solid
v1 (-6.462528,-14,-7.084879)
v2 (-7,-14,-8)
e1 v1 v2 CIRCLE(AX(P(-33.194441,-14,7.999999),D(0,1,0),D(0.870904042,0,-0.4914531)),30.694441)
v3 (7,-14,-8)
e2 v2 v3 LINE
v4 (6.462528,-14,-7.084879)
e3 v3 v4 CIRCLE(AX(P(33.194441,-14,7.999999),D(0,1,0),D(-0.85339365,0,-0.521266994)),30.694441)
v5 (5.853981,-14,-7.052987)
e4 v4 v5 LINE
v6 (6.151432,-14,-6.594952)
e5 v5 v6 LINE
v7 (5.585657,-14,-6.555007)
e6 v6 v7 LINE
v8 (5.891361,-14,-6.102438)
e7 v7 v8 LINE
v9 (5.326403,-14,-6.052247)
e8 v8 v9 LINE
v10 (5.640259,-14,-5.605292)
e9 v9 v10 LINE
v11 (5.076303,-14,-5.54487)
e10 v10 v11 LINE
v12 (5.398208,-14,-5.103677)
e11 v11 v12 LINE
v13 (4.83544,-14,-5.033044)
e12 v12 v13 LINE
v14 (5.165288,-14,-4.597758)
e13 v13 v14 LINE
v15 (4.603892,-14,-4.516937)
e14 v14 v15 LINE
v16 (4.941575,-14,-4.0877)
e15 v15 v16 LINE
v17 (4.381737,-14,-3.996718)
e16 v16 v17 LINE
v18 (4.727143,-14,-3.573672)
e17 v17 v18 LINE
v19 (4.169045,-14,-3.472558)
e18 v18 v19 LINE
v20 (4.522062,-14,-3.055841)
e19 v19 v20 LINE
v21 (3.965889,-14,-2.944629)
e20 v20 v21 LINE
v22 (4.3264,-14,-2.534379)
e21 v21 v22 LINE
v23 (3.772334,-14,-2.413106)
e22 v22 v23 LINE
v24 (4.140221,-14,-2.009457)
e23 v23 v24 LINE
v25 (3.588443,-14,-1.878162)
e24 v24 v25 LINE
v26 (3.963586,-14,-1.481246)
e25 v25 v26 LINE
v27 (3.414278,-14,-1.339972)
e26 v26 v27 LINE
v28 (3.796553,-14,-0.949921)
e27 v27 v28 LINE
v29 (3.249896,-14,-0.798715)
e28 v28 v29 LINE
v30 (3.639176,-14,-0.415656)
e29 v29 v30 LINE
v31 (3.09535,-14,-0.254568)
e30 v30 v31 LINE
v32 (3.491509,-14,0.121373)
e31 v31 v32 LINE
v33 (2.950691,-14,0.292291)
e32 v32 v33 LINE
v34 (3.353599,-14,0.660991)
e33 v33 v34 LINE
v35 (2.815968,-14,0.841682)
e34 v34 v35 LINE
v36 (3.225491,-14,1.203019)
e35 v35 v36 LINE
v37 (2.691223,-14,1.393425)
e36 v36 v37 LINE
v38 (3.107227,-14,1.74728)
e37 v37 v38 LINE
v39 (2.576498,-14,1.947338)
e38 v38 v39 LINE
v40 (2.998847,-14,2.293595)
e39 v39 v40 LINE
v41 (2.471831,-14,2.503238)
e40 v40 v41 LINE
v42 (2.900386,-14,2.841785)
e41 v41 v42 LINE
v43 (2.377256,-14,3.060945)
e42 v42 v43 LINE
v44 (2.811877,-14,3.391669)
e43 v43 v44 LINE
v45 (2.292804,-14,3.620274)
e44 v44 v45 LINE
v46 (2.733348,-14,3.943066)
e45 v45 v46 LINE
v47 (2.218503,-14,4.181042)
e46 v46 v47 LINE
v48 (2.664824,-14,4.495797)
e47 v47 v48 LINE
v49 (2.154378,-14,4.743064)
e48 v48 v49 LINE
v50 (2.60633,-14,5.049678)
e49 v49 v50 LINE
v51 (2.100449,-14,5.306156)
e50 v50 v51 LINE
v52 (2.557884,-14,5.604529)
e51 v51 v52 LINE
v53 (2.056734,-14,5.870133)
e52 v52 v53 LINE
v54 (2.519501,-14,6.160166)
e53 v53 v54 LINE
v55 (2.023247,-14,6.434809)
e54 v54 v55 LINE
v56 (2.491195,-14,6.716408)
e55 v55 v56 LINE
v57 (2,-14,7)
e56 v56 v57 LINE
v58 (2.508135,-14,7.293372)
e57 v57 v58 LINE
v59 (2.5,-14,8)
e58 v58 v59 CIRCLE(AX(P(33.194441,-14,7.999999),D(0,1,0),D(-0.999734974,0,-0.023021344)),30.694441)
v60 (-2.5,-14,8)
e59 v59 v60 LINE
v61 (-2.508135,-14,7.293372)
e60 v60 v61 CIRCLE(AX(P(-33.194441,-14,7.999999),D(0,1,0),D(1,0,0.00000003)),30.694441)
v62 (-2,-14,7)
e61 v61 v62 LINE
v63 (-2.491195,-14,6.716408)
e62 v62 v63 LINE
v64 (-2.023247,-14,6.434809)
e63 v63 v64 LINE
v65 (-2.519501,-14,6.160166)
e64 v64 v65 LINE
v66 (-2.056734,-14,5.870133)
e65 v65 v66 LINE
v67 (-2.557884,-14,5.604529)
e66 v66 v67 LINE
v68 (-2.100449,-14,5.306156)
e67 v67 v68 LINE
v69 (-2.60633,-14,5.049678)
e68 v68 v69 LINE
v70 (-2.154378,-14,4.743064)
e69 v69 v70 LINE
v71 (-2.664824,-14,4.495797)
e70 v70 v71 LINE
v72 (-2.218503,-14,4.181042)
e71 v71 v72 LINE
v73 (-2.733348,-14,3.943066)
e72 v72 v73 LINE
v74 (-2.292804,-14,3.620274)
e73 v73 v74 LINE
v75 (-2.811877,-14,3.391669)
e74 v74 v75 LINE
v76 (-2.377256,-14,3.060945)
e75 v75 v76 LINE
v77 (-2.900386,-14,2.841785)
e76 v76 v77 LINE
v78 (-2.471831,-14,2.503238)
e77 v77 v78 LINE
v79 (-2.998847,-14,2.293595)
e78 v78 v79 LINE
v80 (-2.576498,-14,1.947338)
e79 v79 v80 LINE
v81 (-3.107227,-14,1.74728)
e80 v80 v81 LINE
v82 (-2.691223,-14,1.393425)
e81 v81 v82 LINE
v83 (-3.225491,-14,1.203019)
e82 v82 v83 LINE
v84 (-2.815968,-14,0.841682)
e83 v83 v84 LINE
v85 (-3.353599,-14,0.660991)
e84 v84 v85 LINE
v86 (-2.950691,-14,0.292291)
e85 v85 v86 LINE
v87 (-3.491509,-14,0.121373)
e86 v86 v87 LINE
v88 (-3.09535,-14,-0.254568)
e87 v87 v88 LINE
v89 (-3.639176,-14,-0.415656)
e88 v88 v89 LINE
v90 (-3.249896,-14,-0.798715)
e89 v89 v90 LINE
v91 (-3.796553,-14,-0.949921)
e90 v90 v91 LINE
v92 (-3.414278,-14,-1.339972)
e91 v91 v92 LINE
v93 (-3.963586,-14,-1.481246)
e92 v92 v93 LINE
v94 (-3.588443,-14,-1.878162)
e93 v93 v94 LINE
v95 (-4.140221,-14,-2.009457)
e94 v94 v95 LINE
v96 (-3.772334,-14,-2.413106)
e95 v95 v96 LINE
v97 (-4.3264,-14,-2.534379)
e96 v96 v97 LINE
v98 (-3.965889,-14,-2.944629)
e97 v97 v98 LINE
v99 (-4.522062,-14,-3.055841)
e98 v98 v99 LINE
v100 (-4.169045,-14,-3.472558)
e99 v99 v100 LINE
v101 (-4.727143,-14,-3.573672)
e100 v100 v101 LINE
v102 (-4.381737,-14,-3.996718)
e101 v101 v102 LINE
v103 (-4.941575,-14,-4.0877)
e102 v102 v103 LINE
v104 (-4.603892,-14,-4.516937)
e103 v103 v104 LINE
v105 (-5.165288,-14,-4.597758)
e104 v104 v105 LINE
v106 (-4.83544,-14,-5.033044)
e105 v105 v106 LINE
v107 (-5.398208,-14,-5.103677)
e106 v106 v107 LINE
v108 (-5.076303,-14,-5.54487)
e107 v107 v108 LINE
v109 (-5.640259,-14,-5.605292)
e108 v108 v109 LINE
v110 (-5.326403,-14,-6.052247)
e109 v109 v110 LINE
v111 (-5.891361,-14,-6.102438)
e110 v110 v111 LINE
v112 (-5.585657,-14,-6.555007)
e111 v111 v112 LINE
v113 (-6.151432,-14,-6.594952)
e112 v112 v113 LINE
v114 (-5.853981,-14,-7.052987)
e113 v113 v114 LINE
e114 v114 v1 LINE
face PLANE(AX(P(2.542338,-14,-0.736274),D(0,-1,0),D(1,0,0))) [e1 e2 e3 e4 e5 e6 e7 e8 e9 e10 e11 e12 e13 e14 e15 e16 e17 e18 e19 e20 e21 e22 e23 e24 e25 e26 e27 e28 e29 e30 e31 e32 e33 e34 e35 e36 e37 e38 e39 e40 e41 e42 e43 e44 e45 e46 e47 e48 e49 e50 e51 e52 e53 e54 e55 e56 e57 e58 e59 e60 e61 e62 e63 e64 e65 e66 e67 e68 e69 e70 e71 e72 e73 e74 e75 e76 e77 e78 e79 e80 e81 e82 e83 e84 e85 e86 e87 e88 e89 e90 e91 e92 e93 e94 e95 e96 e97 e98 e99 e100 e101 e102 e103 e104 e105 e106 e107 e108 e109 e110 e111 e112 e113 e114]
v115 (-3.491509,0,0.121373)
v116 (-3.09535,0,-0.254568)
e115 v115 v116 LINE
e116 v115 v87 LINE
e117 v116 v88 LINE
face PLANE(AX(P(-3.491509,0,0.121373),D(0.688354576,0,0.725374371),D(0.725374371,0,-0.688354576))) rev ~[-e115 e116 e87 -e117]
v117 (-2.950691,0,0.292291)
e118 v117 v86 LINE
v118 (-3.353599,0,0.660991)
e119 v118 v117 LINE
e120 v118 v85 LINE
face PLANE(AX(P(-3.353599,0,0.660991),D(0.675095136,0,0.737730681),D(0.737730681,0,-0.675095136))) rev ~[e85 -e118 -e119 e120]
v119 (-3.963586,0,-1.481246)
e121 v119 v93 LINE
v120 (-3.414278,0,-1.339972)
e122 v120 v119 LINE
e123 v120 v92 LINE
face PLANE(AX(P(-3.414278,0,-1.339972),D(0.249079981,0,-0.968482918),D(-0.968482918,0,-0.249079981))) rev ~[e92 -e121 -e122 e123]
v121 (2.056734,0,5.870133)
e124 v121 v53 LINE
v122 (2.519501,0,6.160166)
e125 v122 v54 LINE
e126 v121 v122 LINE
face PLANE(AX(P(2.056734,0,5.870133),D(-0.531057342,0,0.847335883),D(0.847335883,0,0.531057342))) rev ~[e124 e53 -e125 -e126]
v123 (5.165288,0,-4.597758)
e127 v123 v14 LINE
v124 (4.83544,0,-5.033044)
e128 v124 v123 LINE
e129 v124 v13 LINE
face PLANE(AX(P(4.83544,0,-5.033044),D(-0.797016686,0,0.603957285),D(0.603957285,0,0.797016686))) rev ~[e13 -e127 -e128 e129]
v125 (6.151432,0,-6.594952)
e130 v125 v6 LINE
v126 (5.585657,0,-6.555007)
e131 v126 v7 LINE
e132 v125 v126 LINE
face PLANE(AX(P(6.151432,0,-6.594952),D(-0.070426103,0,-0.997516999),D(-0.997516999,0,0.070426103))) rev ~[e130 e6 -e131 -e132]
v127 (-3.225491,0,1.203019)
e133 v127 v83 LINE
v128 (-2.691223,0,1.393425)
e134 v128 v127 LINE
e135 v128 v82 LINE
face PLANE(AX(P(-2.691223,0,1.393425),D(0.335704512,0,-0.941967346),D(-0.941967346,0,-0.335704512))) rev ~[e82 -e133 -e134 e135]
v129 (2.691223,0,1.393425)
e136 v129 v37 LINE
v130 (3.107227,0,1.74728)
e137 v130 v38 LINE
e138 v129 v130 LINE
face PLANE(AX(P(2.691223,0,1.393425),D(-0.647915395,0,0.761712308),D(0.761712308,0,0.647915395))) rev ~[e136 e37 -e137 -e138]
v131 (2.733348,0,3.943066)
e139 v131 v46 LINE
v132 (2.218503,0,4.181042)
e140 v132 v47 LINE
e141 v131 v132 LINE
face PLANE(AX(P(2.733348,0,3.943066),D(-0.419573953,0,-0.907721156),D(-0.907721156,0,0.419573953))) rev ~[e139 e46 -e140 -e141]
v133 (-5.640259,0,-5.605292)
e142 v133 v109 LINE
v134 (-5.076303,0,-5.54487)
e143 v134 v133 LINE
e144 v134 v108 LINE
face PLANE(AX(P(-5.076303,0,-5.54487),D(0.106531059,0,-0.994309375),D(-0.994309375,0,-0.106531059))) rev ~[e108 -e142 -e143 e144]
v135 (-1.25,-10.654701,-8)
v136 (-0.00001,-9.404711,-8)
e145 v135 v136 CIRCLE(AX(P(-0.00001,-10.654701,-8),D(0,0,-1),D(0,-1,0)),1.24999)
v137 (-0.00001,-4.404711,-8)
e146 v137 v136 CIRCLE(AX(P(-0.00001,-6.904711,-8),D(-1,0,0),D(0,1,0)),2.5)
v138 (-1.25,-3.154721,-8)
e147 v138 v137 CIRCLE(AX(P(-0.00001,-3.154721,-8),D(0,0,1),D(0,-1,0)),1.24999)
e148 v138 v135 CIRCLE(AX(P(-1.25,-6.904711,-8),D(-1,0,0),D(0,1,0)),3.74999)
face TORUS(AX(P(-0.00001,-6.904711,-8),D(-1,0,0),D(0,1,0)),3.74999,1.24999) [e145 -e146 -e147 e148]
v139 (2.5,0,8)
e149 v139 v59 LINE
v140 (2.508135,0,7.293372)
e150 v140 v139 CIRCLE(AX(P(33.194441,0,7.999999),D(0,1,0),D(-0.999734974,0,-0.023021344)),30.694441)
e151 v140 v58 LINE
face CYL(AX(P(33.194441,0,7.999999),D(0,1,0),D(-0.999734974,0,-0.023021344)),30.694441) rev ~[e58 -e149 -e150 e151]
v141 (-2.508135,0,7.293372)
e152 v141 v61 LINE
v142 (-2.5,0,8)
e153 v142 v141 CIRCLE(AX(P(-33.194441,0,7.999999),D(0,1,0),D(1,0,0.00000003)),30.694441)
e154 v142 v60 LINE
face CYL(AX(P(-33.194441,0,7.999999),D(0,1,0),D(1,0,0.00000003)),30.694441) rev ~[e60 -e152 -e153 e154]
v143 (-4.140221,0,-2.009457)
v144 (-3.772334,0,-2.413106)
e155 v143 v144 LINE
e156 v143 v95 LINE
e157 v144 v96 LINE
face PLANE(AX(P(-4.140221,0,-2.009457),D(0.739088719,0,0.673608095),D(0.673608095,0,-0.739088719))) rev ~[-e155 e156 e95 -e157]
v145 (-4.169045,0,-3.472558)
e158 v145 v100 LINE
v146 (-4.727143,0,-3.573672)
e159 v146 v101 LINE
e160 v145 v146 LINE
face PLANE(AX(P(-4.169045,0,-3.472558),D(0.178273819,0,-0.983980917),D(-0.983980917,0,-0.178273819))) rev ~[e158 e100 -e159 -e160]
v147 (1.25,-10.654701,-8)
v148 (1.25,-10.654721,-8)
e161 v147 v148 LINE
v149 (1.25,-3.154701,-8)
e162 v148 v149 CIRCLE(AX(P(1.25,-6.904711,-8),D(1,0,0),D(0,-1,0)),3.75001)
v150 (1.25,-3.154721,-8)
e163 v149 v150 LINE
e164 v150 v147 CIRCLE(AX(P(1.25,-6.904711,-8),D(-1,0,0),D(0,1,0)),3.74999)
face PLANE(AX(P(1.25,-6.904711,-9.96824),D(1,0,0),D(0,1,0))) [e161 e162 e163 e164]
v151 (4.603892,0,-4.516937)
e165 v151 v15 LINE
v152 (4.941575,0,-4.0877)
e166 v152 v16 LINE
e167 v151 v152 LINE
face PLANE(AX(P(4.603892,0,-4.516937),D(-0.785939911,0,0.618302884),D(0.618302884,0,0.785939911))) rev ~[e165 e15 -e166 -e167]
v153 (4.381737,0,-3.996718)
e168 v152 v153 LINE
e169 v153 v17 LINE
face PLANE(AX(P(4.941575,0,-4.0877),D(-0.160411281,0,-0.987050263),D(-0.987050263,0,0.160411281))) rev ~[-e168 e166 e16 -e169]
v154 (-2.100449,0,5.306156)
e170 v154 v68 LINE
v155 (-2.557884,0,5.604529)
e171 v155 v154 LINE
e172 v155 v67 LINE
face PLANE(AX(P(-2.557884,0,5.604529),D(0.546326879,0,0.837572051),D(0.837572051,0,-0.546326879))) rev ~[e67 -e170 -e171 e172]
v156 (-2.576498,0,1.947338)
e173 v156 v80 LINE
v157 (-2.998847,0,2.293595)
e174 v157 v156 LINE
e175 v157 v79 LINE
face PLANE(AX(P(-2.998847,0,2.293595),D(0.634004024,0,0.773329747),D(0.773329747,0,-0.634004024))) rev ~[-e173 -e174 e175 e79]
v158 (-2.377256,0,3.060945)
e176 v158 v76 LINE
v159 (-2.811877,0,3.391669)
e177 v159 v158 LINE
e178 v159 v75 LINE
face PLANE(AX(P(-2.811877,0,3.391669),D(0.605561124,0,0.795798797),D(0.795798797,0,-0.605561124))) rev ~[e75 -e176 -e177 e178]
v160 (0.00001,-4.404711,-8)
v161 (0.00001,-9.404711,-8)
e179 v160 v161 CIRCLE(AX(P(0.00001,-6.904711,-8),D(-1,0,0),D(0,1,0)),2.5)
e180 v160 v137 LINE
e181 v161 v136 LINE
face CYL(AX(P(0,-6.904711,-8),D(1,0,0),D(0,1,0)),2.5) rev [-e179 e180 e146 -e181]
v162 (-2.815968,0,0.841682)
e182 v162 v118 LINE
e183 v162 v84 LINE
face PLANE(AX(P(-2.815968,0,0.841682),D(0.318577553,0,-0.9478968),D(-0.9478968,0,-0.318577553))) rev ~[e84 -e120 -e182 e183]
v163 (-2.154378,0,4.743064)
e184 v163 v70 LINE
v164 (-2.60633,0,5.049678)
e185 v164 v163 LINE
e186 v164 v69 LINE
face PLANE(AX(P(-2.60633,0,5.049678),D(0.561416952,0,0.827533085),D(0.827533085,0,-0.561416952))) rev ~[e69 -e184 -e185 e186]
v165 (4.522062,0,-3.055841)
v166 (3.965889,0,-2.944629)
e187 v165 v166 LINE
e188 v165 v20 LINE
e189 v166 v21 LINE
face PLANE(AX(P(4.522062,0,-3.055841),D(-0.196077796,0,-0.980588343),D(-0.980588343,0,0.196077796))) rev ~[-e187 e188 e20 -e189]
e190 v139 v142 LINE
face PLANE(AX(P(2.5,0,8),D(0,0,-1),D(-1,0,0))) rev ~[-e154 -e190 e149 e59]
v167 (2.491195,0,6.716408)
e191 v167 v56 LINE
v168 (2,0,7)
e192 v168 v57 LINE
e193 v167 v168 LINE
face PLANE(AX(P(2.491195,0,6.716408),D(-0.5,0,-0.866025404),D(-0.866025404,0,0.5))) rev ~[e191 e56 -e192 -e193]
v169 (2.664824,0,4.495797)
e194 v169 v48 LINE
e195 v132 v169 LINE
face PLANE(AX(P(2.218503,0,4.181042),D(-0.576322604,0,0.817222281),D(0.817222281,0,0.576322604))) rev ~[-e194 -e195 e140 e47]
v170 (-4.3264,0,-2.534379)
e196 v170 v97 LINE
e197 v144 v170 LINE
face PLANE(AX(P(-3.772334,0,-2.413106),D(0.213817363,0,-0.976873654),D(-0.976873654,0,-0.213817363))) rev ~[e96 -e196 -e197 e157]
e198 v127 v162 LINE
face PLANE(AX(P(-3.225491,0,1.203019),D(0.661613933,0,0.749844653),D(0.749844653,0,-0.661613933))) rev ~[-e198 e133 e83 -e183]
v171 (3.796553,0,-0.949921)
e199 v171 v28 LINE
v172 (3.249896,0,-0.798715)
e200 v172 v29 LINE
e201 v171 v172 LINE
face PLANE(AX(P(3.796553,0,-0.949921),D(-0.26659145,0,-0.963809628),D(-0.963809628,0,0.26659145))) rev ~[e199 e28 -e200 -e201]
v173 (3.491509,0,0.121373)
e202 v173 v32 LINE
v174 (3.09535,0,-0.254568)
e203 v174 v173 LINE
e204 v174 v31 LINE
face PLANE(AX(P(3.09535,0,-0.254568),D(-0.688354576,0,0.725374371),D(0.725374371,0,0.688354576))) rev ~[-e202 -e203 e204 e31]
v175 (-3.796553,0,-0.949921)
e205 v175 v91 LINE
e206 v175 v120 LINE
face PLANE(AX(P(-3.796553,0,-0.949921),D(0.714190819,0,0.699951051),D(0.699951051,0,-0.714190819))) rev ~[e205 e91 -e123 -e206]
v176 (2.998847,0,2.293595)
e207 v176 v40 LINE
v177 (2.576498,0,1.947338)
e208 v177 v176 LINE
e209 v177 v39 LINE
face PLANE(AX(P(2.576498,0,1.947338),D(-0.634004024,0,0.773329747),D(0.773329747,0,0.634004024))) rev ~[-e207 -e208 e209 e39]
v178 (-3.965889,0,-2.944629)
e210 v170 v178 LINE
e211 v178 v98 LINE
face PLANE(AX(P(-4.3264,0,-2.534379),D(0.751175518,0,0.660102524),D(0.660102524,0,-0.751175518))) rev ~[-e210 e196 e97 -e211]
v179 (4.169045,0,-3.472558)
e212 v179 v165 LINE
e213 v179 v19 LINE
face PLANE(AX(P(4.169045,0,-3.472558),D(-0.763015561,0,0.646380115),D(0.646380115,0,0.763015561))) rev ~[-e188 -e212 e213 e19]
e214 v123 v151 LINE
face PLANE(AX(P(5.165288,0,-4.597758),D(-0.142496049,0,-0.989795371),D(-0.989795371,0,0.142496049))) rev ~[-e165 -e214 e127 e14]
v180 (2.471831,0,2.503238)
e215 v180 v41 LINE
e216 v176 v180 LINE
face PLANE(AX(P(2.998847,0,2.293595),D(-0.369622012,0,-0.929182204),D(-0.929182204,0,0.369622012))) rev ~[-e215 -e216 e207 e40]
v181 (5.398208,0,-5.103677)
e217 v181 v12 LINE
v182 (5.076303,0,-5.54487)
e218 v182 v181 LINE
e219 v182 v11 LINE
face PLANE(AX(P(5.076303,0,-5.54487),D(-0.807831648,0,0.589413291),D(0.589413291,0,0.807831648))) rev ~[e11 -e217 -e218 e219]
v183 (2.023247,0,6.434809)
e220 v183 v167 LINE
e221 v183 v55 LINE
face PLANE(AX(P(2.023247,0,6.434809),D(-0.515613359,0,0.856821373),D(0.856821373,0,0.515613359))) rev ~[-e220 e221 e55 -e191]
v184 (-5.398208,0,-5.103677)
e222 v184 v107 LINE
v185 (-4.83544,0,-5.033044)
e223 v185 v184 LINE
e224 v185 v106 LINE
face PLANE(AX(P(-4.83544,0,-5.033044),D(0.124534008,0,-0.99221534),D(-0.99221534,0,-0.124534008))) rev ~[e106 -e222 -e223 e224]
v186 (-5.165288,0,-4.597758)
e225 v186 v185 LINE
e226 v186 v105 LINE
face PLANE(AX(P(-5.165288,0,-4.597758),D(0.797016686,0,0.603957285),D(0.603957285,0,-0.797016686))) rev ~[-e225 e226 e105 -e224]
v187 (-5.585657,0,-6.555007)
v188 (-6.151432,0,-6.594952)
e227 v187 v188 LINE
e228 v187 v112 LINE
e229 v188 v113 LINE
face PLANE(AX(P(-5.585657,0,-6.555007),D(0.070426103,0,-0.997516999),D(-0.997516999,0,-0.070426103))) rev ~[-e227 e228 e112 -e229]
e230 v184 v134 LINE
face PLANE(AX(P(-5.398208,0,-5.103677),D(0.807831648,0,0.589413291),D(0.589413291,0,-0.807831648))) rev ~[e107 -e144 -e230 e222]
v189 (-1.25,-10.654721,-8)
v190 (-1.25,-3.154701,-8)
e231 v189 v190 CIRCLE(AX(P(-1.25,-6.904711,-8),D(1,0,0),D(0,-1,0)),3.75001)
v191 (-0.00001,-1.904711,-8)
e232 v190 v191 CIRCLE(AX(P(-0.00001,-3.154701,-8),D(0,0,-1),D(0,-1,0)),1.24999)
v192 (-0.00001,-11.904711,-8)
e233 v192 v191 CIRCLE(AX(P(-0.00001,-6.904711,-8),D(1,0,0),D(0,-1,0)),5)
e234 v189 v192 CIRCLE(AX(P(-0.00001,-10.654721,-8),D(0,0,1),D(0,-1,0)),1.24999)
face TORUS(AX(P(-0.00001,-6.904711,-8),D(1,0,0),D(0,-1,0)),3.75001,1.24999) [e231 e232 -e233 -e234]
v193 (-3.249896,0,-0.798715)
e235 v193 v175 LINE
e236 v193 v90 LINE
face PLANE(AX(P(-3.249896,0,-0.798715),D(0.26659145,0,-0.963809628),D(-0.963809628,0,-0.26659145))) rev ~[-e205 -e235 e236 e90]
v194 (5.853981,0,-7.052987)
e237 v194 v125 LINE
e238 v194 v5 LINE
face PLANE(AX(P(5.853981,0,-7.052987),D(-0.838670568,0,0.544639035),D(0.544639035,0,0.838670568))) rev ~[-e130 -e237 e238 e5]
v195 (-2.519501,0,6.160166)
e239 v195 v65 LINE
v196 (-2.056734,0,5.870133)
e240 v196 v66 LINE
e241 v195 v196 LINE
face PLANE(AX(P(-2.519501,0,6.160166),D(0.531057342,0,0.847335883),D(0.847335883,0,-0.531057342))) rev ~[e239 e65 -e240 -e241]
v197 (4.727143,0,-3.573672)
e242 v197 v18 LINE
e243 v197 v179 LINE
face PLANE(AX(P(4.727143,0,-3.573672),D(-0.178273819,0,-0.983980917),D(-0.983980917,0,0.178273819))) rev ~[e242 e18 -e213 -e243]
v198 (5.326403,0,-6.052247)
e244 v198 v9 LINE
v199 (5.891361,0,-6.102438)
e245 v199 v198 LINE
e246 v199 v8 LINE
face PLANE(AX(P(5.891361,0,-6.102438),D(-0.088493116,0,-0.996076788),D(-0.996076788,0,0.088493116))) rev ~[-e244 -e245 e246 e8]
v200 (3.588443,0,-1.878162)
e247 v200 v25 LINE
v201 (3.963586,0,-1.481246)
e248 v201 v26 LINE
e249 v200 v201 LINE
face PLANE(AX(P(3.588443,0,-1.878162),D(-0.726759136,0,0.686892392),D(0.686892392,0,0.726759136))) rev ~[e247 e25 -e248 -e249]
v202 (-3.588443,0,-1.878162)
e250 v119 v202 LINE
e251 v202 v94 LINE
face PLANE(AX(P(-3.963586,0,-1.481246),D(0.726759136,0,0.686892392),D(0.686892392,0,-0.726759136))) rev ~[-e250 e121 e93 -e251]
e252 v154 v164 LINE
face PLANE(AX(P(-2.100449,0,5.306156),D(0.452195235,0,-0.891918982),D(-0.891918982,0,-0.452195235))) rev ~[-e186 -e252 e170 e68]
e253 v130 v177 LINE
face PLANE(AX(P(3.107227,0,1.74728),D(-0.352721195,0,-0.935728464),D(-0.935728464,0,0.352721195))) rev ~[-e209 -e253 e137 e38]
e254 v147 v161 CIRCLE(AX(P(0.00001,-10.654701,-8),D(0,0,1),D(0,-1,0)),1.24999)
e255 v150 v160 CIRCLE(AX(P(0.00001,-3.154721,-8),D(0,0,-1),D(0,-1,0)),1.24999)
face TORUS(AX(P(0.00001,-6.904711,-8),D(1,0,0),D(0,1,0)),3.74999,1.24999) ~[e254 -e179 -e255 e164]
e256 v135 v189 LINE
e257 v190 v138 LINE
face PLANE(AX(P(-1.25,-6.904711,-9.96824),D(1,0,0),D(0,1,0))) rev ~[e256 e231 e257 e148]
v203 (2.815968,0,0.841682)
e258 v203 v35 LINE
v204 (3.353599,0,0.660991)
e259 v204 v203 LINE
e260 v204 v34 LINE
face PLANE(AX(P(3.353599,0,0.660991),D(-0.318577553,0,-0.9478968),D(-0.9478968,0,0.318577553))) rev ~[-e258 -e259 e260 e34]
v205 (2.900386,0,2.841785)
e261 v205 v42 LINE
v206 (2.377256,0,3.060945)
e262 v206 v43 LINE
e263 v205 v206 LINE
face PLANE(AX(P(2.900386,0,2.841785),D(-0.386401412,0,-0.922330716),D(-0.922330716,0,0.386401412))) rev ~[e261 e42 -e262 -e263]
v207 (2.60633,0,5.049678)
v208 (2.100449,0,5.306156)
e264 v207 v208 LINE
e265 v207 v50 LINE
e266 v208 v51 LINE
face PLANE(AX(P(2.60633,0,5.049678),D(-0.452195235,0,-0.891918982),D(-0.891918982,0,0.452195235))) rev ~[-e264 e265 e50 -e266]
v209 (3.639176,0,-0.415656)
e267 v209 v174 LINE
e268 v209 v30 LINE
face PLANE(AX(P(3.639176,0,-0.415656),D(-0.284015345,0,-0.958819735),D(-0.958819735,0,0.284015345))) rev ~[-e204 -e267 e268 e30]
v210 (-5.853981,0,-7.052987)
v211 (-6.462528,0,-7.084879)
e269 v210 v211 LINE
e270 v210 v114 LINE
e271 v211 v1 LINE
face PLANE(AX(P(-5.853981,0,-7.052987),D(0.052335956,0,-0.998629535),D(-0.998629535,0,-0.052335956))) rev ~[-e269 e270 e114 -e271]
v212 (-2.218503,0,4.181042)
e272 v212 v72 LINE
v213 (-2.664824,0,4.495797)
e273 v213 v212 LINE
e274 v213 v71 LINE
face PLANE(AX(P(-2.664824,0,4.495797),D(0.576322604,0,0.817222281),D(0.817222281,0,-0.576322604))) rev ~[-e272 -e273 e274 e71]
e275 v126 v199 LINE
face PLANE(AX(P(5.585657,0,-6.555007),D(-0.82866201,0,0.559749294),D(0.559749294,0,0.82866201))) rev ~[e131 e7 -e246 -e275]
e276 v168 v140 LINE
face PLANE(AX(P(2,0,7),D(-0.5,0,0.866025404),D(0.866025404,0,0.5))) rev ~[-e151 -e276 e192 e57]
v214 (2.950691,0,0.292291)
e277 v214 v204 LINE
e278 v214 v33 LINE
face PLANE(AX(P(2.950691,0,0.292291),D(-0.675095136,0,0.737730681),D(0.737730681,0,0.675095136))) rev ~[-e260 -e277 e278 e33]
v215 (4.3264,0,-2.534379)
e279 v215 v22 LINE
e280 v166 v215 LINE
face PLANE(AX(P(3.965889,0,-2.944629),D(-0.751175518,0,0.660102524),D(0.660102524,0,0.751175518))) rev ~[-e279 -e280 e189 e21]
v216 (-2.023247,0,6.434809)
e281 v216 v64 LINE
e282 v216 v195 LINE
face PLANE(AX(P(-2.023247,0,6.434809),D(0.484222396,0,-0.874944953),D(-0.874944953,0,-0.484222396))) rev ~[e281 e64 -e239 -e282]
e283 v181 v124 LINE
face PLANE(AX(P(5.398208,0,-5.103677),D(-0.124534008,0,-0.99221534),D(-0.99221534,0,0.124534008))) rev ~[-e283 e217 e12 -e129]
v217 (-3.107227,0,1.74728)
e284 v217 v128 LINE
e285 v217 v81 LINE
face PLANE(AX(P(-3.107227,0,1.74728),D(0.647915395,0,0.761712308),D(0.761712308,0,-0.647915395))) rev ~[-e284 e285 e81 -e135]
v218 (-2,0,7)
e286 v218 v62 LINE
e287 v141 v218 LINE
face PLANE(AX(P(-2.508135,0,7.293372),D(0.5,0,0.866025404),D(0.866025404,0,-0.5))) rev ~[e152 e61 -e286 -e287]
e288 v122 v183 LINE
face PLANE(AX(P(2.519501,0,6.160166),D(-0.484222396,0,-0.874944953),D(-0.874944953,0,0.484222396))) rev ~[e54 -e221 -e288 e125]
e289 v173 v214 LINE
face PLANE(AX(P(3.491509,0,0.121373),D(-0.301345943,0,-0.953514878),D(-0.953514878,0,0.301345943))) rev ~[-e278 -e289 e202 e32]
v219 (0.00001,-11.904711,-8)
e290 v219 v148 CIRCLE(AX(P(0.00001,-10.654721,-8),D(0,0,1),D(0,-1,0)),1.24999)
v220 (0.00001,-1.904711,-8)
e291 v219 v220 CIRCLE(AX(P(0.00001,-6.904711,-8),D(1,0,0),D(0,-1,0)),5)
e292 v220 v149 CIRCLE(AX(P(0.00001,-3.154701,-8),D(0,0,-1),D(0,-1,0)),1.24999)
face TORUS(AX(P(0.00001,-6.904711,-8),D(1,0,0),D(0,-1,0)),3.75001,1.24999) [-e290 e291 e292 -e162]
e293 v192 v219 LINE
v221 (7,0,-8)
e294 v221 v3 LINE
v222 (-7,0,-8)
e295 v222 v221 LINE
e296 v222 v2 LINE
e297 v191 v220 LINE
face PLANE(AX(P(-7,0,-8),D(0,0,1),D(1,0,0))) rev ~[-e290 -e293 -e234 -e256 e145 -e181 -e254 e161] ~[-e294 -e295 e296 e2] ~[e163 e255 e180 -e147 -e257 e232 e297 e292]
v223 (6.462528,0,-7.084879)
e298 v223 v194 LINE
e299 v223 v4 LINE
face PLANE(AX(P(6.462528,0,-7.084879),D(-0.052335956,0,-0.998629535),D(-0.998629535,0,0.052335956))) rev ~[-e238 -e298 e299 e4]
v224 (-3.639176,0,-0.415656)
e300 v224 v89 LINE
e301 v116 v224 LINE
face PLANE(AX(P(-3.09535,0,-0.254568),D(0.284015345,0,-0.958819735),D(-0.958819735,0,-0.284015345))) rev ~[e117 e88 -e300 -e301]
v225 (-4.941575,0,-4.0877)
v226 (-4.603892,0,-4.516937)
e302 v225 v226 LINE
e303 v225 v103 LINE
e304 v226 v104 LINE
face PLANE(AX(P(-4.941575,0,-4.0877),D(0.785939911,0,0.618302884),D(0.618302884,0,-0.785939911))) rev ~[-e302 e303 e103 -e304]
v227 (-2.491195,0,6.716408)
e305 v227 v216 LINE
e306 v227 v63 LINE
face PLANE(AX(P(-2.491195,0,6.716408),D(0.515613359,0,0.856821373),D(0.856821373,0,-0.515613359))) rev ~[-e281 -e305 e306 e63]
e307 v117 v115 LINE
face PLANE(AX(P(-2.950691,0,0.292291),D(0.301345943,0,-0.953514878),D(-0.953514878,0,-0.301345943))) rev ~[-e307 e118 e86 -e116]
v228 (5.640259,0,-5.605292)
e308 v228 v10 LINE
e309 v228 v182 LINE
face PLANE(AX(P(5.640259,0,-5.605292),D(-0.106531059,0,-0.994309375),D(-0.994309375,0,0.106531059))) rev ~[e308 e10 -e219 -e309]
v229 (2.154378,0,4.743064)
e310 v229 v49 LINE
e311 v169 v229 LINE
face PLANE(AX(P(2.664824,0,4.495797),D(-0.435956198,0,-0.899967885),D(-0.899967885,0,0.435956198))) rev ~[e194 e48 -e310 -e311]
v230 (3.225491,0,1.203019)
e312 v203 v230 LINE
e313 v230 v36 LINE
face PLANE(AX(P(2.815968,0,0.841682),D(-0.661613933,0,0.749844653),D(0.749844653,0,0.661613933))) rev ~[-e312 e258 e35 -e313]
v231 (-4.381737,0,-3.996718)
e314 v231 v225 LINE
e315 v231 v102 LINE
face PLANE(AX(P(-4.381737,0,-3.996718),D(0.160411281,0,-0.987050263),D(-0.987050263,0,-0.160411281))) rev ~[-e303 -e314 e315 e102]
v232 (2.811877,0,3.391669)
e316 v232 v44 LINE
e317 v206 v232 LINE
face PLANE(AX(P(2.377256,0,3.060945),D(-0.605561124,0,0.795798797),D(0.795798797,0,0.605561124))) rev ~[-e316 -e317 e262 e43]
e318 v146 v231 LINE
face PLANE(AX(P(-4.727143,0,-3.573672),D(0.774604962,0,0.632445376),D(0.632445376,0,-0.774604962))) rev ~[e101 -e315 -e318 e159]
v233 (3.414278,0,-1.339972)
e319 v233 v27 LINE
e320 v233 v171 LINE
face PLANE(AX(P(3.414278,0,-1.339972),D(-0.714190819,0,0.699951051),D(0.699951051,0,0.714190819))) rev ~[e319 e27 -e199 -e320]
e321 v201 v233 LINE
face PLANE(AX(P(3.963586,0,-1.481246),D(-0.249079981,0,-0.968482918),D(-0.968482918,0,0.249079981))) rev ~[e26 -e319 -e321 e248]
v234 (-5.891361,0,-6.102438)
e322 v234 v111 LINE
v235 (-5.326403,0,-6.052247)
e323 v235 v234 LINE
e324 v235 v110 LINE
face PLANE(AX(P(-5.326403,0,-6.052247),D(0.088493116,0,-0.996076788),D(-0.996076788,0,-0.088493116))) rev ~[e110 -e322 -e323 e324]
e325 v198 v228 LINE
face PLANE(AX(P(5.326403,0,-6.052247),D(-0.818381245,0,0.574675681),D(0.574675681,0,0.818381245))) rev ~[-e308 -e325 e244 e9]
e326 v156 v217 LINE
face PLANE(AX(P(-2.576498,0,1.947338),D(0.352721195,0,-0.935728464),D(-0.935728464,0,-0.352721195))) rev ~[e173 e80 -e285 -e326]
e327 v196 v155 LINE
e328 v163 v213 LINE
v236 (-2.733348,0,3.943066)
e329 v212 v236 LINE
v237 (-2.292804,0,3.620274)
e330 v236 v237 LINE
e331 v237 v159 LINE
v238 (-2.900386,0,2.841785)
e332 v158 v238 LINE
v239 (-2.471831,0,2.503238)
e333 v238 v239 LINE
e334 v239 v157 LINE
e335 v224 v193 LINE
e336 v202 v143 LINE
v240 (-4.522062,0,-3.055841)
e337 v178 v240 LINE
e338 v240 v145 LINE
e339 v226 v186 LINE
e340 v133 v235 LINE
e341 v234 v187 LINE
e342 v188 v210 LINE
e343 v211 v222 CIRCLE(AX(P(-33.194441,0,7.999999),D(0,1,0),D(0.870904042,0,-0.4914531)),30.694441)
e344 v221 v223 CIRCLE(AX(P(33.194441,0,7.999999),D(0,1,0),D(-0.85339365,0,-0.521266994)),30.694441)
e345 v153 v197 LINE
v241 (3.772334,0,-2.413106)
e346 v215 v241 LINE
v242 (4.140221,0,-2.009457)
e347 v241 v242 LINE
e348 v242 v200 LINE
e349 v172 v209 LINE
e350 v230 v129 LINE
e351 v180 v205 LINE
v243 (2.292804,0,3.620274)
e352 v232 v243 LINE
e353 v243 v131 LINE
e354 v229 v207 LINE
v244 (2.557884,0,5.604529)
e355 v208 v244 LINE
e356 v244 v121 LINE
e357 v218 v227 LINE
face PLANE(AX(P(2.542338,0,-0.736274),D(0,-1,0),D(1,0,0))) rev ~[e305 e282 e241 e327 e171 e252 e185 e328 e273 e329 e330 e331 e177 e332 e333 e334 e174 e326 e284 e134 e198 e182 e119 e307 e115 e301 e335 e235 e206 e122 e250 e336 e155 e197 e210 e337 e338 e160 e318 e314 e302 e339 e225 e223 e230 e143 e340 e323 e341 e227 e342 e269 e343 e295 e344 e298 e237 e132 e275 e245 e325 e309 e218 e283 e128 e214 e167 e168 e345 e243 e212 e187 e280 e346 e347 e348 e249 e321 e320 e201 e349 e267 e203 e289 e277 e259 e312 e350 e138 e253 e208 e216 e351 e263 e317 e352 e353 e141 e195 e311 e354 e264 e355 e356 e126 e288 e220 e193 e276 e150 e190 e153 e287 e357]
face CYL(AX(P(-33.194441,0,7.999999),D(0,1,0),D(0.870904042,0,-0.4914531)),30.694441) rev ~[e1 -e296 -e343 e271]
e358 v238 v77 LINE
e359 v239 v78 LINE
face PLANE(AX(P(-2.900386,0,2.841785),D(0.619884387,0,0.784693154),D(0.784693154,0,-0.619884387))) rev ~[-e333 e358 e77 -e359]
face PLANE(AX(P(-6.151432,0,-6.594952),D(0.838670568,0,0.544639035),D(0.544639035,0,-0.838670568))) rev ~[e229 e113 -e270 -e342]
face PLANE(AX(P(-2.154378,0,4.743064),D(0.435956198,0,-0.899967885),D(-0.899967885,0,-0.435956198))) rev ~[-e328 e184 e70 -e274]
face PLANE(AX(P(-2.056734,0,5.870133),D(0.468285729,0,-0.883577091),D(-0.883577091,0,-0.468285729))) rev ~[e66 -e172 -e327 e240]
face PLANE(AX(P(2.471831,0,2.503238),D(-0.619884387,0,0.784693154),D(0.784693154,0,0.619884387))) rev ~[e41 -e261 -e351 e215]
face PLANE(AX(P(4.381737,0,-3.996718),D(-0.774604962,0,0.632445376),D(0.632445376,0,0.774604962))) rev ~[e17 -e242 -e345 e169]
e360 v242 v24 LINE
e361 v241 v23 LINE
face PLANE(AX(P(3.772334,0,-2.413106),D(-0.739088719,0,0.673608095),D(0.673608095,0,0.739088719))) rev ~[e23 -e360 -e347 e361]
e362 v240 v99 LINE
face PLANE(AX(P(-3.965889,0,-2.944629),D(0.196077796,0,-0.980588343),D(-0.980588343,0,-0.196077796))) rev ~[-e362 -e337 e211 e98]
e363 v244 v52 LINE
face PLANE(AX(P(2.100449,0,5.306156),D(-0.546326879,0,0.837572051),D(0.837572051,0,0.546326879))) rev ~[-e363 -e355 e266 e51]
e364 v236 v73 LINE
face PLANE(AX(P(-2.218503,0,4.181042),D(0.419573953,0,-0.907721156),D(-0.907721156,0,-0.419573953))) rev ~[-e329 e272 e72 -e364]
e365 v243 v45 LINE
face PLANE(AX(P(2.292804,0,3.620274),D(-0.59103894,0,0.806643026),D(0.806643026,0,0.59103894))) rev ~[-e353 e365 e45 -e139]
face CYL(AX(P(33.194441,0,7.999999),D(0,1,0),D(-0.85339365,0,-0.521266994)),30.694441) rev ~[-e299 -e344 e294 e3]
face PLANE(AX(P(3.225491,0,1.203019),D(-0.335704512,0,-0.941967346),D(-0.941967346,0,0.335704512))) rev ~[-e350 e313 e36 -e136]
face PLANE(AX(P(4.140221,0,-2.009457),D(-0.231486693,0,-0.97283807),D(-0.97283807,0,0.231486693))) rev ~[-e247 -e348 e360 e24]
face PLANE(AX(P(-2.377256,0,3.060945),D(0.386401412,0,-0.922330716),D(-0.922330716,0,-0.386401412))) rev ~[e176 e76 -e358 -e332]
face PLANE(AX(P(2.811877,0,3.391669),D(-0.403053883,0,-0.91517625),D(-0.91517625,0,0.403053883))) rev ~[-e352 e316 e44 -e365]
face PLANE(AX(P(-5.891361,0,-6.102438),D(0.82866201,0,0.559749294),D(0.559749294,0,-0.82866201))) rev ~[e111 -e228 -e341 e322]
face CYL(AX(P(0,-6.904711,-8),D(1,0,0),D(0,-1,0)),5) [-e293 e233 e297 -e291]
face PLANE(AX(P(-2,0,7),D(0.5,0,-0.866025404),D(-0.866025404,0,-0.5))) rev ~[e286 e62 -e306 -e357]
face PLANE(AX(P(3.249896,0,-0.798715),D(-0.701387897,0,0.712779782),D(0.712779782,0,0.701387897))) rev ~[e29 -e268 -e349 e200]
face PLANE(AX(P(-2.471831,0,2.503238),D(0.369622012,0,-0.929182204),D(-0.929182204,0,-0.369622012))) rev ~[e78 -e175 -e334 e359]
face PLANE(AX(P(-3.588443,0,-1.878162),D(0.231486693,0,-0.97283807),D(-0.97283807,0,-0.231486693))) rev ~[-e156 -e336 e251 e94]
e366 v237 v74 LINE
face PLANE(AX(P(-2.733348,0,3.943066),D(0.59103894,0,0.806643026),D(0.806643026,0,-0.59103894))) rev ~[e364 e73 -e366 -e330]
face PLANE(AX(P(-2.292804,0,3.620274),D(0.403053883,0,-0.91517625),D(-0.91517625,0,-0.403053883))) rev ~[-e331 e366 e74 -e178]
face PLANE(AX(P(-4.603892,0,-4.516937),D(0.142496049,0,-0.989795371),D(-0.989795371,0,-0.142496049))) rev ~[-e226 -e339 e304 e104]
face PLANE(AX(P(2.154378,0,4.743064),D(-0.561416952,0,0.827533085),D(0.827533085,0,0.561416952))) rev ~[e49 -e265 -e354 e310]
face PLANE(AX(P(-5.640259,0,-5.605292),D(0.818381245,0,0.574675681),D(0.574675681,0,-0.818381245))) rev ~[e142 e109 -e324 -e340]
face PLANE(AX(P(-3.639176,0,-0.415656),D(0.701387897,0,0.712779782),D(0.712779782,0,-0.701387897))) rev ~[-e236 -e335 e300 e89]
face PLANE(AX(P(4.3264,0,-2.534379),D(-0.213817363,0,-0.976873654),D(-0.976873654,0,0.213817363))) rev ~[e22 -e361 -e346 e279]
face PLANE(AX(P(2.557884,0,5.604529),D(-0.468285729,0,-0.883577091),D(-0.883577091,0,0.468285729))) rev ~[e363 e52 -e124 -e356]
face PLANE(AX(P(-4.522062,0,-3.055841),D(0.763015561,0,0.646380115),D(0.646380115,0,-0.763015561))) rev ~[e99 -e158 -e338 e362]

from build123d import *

# Parameters (mm, degrees)
F1_DEPTH = 14
F3_DEPTH = 1.25
F4_R     = 1.24999


# Not quite as in the source:
# - a fillet or chamfer is up to 0.001 mm smaller than in the source, because OpenCascade refuses the exact size


with BuildPart() as f1:
    # F0 (on Front) → F1 (new body)
    with BuildSketch(Plane.XZ):
        with BuildLine():
            Line((0, 8), (0, -8))
            Line((0, -8), (7, -8))
            ThreePointArc((7, -8), (6.7273087271, -7.5447627069), (6.462528291, -7.0848791956))
            Line((6.462528291, -7.0848791956), (5.8539806535, -7.0529865653))
            Line((5.8539806535, -7.0529865653), (6.1514320159, -6.5949516339))
            Line((6.1514320159, -6.5949516339), (5.5856572031, -6.5550071363))
            Line((5.5856572031, -6.5550071363), (5.8913609435, -6.1024383189))
            Line((5.8913609435, -6.1024383189), (5.326402994, -6.0522465166))
            Line((5.326402994, -6.0522465166), (5.6402586914, -5.605292478))
            Line((5.6402586914, -5.605292478), (5.0763031889, -5.5448698584))
            Line((5.0763031889, -5.5448698584), (5.3982077445, -5.1036774191))
            Line((5.3982077445, -5.1036774191), (4.8354399434, -5.0330438306))
            Line((4.8354399434, -5.0330438306), (5.1652876144, -4.5977579185))
            Line((5.1652876144, -4.5977579185), (4.603892379, -4.5169365636))
            Line((4.603892379, -4.5169365636), (4.9415748133, -4.087700166))
            Line((4.9415748133, -4.087700166), (4.3817365569, -3.9967175939))
            Line((4.3817365569, -3.9967175939), (4.7271428288, -3.5736717114))
            Line((4.7271428288, -3.5736717114), (4.1690454534, -3.4725578088))
            Line((4.1690454534, -3.4725578088), (4.5220621001, -3.0558414082))
            Line((4.5220621001, -3.0558414082), (3.9658889357, -2.9446293904))
            Line((3.9658889357, -2.9446293904), (4.3263999942, -2.5343793592))
            Line((4.3263999942, -2.5343793592), (3.7723337388, -2.4131057583))
            Line((3.7723337388, -2.4131057583), (4.1402207845, -2.0094568602))
            Line((4.1402207845, -2.0094568602), (3.5884434439, -1.8781615134))
            Line((3.5884434439, -1.8781615134), (3.9635856292, -1.4812463433))
            Line((3.9635856292, -1.4812463433), (3.4142784574, -1.3399723801))
            Line((3.4142784574, -1.3399723801), (3.7965525514, -0.9499213213))
            Line((3.7965525514, -0.9499213213), (3.2498959909, -0.7987151488))
            Line((3.2498959909, -0.7987151488), (3.6391764199, -0.4156563295))
            Line((3.6391764199, -0.4156563295), (3.0953500426, -0.2545676177))
            Line((3.0953500426, -0.2545676177), (3.4915089314, 0.1213731306))
            Line((3.4915089314, 0.1213731306), (2.9506913795, 0.2922914656))
            Line((2.9506913795, 0.2922914656), (3.3535985934, 0.6609906496))
            Line((3.3535985934, 0.6609906496), (2.8159675207, 0.8416824626))
            Line((2.8159675207, 0.8416824626), (3.2254907083, 1.203018968))
            Line((3.2254907083, 1.203018968), (2.6912227217, 1.3934249033))
            Line((2.6912227217, 1.3934249033), (3.1072273582, 1.7472800342))
            Line((3.1072273582, 1.7472800342), (2.5764979601, 1.9473375451))
            Line((2.5764979601, 1.9473375451), (2.9988473918, 2.2935950634))
            Line((2.9988473918, 2.2935950634), (2.4718309221, 2.5032384328))
            Line((2.4718309221, 2.5032384328), (2.9003864108, 2.8417845957))
            Line((2.9003864108, 2.8417845957), (2.3772559897, 3.0609449576))
            Line((2.3772559897, 3.0609449576), (2.8118767588, 3.3916685559))
            Line((2.8118767588, 3.3916685559), (2.2928042301, 3.6202739181))
            Line((2.2928042301, 3.6202739181), (2.7333475104, 3.9430663119))
            Line((2.7333475104, 3.9430663119), (2.2185033848, 4.1810415796))
            Line((2.2185033848, 4.1810415796), (2.6648244619, 4.4957967344))
            Line((2.6648244619, 4.4957967344), (2.1543778611, 4.7430637348))
            Line((2.1543778611, 4.7430637348), (2.6063301224, 5.0496782564))
            Line((2.6063301224, 5.0496782564), (2.1004487236, 5.3061557644))
            Line((2.1004487236, 5.3061557644), (2.5578837068, 5.6045289327))
            Line((2.5578837068, 5.6045289327), (2.0567336876, 5.8701326978))
            Line((2.0567336876, 5.8701326978), (2.5195011293, 6.1601664998))
            Line((2.5195011293, 6.1601664998), (2.0232471131, 6.4348092734))
            Line((2.0232471131, 6.4348092734), (2.4911949982, 6.7164084356))
            Line((2.4911949982, 6.7164084356), (2, 7))
            Line((2, 7), (2.5081348332, 7.2933717827))
            ThreePointArc((2.5081348332, 7.2933717827), (2.5020337704, 7.6466624796), (2.5, 8))
            Line((2.5, 8), (0, 8))
        make_face()
        with BuildLine():
            ThreePointArc((-6.462528291, -7.0848791956), (-6.7273087271, -7.5447627069), (-7, -8))
            Line((-7, -8), (0, -8))
            Line((0, -8), (0, 8))
            Line((0, 8), (-2.5, 8))
            ThreePointArc((-2.5, 8), (-2.5020337704, 7.6466624796), (-2.5081348332, 7.2933717827))
            Line((-2.5081348332, 7.2933717827), (-2, 7))
            Line((-2, 7), (-2.4911949982, 6.7164084356))
            Line((-2.4911949982, 6.7164084356), (-2.0232471131, 6.4348092734))
            Line((-2.0232471131, 6.4348092734), (-2.5195011293, 6.1601664998))
            Line((-2.5195011293, 6.1601664998), (-2.0567336876, 5.8701326978))
            Line((-2.0567336876, 5.8701326978), (-2.5578837068, 5.6045289327))
            Line((-2.5578837068, 5.6045289327), (-2.1004487236, 5.3061557644))
            Line((-2.1004487236, 5.3061557644), (-2.6063301224, 5.0496782564))
            Line((-2.6063301224, 5.0496782564), (-2.1543778611, 4.7430637348))
            Line((-2.1543778611, 4.7430637348), (-2.6648244619, 4.4957967344))
            Line((-2.6648244619, 4.4957967344), (-2.2185033848, 4.1810415796))
            Line((-2.2185033848, 4.1810415796), (-2.7333475104, 3.9430663119))
            Line((-2.7333475104, 3.9430663119), (-2.2928042301, 3.6202739181))
            Line((-2.2928042301, 3.6202739181), (-2.8118767588, 3.3916685559))
            Line((-2.8118767588, 3.3916685559), (-2.3772559897, 3.0609449576))
            Line((-2.3772559897, 3.0609449576), (-2.9003864108, 2.8417845957))
            Line((-2.9003864108, 2.8417845957), (-2.4718309221, 2.5032384328))
            Line((-2.4718309221, 2.5032384328), (-2.9988473918, 2.2935950634))
            Line((-2.9988473918, 2.2935950634), (-2.5764979601, 1.9473375451))
            Line((-2.5764979601, 1.9473375451), (-3.1072273582, 1.7472800342))
            Line((-3.1072273582, 1.7472800342), (-2.6912227217, 1.3934249033))
            Line((-2.6912227217, 1.3934249033), (-3.2254907083, 1.203018968))
            Line((-3.2254907083, 1.203018968), (-2.8159675207, 0.8416824626))
            Line((-2.8159675207, 0.8416824626), (-3.3535985934, 0.6609906496))
            Line((-3.3535985934, 0.6609906496), (-2.9506913795, 0.2922914656))
            Line((-2.9506913795, 0.2922914656), (-3.4915089314, 0.1213731306))
            Line((-3.4915089314, 0.1213731306), (-3.0953500426, -0.2545676177))
            Line((-3.0953500426, -0.2545676177), (-3.6391764199, -0.4156563295))
            Line((-3.6391764199, -0.4156563295), (-3.2498959909, -0.7987151488))
            Line((-3.2498959909, -0.7987151488), (-3.7965525514, -0.9499213213))
            Line((-3.7965525514, -0.9499213213), (-3.4142784574, -1.3399723801))
            Line((-3.4142784574, -1.3399723801), (-3.9635856292, -1.4812463433))
            Line((-3.9635856292, -1.4812463433), (-3.5884434439, -1.8781615134))
            Line((-3.5884434439, -1.8781615134), (-4.1402207845, -2.0094568602))
            Line((-4.1402207845, -2.0094568602), (-3.7723337388, -2.4131057583))
            Line((-3.7723337388, -2.4131057583), (-4.3263999942, -2.5343793592))
            Line((-4.3263999942, -2.5343793592), (-3.9658889357, -2.9446293904))
            Line((-3.9658889357, -2.9446293904), (-4.5220621001, -3.0558414082))
            Line((-4.5220621001, -3.0558414082), (-4.1690454534, -3.4725578088))
            Line((-4.1690454534, -3.4725578088), (-4.7271428288, -3.5736717114))
            Line((-4.7271428288, -3.5736717114), (-4.3817365569, -3.9967175939))
            Line((-4.3817365569, -3.9967175939), (-4.9415748133, -4.087700166))
            Line((-4.9415748133, -4.087700166), (-4.603892379, -4.5169365636))
            Line((-4.603892379, -4.5169365636), (-5.1652876144, -4.5977579185))
            Line((-5.1652876144, -4.5977579185), (-4.8354399434, -5.0330438306))
            Line((-4.8354399434, -5.0330438306), (-5.3982077445, -5.1036774191))
            Line((-5.3982077445, -5.1036774191), (-5.0763031889, -5.5448698584))
            Line((-5.0763031889, -5.5448698584), (-5.6402586914, -5.605292478))
            Line((-5.6402586914, -5.605292478), (-5.326402994, -6.0522465166))
            Line((-5.326402994, -6.0522465166), (-5.8913609435, -6.1024383189))
            Line((-5.8913609435, -6.1024383189), (-5.5856572031, -6.5550071363))
            Line((-5.5856572031, -6.5550071363), (-6.1514320159, -6.5949516339))
            Line((-6.1514320159, -6.5949516339), (-5.8539806535, -7.0529865653))
            Line((-5.8539806535, -7.0529865653), (-6.462528291, -7.0848791956))
        make_face()
    extrude(amount=F1_DEPTH)

    # F2 (on Right) → F3 (join, symmetric)
    with BuildSketch(Plane.YZ):
        with BuildLine():
            Line((-9.4047106404, -8), (-11.9047106404, -8))
            ThreePointArc((-11.9047106404, -8), (-6.9047106404, -13), (-1.9047106404, -8))
            Line((-1.9047106404, -8), (-4.4047106404, -8))
            ThreePointArc((-4.4047106404, -8), (-6.9047106404, -10.5), (-9.4047106404, -8))
        make_face()
    extrude(amount=F3_DEPTH, both=True)

    # F4 (radius 1.25 in the source; OpenCascade refuses exactly that, so slightly less here)
    f4_edges = [f1.edges().sort_by_distance(p)[0] for p in [
        (1.25, -6.904711, -13),
        (-1.25, -6.904711, -13),
        (1.25, -6.904711, -10.5),
        (-1.25, -6.904711, -10.5),
    ]]
    fillet(f4_edges, radius=F4_R)


solid = f1.part
